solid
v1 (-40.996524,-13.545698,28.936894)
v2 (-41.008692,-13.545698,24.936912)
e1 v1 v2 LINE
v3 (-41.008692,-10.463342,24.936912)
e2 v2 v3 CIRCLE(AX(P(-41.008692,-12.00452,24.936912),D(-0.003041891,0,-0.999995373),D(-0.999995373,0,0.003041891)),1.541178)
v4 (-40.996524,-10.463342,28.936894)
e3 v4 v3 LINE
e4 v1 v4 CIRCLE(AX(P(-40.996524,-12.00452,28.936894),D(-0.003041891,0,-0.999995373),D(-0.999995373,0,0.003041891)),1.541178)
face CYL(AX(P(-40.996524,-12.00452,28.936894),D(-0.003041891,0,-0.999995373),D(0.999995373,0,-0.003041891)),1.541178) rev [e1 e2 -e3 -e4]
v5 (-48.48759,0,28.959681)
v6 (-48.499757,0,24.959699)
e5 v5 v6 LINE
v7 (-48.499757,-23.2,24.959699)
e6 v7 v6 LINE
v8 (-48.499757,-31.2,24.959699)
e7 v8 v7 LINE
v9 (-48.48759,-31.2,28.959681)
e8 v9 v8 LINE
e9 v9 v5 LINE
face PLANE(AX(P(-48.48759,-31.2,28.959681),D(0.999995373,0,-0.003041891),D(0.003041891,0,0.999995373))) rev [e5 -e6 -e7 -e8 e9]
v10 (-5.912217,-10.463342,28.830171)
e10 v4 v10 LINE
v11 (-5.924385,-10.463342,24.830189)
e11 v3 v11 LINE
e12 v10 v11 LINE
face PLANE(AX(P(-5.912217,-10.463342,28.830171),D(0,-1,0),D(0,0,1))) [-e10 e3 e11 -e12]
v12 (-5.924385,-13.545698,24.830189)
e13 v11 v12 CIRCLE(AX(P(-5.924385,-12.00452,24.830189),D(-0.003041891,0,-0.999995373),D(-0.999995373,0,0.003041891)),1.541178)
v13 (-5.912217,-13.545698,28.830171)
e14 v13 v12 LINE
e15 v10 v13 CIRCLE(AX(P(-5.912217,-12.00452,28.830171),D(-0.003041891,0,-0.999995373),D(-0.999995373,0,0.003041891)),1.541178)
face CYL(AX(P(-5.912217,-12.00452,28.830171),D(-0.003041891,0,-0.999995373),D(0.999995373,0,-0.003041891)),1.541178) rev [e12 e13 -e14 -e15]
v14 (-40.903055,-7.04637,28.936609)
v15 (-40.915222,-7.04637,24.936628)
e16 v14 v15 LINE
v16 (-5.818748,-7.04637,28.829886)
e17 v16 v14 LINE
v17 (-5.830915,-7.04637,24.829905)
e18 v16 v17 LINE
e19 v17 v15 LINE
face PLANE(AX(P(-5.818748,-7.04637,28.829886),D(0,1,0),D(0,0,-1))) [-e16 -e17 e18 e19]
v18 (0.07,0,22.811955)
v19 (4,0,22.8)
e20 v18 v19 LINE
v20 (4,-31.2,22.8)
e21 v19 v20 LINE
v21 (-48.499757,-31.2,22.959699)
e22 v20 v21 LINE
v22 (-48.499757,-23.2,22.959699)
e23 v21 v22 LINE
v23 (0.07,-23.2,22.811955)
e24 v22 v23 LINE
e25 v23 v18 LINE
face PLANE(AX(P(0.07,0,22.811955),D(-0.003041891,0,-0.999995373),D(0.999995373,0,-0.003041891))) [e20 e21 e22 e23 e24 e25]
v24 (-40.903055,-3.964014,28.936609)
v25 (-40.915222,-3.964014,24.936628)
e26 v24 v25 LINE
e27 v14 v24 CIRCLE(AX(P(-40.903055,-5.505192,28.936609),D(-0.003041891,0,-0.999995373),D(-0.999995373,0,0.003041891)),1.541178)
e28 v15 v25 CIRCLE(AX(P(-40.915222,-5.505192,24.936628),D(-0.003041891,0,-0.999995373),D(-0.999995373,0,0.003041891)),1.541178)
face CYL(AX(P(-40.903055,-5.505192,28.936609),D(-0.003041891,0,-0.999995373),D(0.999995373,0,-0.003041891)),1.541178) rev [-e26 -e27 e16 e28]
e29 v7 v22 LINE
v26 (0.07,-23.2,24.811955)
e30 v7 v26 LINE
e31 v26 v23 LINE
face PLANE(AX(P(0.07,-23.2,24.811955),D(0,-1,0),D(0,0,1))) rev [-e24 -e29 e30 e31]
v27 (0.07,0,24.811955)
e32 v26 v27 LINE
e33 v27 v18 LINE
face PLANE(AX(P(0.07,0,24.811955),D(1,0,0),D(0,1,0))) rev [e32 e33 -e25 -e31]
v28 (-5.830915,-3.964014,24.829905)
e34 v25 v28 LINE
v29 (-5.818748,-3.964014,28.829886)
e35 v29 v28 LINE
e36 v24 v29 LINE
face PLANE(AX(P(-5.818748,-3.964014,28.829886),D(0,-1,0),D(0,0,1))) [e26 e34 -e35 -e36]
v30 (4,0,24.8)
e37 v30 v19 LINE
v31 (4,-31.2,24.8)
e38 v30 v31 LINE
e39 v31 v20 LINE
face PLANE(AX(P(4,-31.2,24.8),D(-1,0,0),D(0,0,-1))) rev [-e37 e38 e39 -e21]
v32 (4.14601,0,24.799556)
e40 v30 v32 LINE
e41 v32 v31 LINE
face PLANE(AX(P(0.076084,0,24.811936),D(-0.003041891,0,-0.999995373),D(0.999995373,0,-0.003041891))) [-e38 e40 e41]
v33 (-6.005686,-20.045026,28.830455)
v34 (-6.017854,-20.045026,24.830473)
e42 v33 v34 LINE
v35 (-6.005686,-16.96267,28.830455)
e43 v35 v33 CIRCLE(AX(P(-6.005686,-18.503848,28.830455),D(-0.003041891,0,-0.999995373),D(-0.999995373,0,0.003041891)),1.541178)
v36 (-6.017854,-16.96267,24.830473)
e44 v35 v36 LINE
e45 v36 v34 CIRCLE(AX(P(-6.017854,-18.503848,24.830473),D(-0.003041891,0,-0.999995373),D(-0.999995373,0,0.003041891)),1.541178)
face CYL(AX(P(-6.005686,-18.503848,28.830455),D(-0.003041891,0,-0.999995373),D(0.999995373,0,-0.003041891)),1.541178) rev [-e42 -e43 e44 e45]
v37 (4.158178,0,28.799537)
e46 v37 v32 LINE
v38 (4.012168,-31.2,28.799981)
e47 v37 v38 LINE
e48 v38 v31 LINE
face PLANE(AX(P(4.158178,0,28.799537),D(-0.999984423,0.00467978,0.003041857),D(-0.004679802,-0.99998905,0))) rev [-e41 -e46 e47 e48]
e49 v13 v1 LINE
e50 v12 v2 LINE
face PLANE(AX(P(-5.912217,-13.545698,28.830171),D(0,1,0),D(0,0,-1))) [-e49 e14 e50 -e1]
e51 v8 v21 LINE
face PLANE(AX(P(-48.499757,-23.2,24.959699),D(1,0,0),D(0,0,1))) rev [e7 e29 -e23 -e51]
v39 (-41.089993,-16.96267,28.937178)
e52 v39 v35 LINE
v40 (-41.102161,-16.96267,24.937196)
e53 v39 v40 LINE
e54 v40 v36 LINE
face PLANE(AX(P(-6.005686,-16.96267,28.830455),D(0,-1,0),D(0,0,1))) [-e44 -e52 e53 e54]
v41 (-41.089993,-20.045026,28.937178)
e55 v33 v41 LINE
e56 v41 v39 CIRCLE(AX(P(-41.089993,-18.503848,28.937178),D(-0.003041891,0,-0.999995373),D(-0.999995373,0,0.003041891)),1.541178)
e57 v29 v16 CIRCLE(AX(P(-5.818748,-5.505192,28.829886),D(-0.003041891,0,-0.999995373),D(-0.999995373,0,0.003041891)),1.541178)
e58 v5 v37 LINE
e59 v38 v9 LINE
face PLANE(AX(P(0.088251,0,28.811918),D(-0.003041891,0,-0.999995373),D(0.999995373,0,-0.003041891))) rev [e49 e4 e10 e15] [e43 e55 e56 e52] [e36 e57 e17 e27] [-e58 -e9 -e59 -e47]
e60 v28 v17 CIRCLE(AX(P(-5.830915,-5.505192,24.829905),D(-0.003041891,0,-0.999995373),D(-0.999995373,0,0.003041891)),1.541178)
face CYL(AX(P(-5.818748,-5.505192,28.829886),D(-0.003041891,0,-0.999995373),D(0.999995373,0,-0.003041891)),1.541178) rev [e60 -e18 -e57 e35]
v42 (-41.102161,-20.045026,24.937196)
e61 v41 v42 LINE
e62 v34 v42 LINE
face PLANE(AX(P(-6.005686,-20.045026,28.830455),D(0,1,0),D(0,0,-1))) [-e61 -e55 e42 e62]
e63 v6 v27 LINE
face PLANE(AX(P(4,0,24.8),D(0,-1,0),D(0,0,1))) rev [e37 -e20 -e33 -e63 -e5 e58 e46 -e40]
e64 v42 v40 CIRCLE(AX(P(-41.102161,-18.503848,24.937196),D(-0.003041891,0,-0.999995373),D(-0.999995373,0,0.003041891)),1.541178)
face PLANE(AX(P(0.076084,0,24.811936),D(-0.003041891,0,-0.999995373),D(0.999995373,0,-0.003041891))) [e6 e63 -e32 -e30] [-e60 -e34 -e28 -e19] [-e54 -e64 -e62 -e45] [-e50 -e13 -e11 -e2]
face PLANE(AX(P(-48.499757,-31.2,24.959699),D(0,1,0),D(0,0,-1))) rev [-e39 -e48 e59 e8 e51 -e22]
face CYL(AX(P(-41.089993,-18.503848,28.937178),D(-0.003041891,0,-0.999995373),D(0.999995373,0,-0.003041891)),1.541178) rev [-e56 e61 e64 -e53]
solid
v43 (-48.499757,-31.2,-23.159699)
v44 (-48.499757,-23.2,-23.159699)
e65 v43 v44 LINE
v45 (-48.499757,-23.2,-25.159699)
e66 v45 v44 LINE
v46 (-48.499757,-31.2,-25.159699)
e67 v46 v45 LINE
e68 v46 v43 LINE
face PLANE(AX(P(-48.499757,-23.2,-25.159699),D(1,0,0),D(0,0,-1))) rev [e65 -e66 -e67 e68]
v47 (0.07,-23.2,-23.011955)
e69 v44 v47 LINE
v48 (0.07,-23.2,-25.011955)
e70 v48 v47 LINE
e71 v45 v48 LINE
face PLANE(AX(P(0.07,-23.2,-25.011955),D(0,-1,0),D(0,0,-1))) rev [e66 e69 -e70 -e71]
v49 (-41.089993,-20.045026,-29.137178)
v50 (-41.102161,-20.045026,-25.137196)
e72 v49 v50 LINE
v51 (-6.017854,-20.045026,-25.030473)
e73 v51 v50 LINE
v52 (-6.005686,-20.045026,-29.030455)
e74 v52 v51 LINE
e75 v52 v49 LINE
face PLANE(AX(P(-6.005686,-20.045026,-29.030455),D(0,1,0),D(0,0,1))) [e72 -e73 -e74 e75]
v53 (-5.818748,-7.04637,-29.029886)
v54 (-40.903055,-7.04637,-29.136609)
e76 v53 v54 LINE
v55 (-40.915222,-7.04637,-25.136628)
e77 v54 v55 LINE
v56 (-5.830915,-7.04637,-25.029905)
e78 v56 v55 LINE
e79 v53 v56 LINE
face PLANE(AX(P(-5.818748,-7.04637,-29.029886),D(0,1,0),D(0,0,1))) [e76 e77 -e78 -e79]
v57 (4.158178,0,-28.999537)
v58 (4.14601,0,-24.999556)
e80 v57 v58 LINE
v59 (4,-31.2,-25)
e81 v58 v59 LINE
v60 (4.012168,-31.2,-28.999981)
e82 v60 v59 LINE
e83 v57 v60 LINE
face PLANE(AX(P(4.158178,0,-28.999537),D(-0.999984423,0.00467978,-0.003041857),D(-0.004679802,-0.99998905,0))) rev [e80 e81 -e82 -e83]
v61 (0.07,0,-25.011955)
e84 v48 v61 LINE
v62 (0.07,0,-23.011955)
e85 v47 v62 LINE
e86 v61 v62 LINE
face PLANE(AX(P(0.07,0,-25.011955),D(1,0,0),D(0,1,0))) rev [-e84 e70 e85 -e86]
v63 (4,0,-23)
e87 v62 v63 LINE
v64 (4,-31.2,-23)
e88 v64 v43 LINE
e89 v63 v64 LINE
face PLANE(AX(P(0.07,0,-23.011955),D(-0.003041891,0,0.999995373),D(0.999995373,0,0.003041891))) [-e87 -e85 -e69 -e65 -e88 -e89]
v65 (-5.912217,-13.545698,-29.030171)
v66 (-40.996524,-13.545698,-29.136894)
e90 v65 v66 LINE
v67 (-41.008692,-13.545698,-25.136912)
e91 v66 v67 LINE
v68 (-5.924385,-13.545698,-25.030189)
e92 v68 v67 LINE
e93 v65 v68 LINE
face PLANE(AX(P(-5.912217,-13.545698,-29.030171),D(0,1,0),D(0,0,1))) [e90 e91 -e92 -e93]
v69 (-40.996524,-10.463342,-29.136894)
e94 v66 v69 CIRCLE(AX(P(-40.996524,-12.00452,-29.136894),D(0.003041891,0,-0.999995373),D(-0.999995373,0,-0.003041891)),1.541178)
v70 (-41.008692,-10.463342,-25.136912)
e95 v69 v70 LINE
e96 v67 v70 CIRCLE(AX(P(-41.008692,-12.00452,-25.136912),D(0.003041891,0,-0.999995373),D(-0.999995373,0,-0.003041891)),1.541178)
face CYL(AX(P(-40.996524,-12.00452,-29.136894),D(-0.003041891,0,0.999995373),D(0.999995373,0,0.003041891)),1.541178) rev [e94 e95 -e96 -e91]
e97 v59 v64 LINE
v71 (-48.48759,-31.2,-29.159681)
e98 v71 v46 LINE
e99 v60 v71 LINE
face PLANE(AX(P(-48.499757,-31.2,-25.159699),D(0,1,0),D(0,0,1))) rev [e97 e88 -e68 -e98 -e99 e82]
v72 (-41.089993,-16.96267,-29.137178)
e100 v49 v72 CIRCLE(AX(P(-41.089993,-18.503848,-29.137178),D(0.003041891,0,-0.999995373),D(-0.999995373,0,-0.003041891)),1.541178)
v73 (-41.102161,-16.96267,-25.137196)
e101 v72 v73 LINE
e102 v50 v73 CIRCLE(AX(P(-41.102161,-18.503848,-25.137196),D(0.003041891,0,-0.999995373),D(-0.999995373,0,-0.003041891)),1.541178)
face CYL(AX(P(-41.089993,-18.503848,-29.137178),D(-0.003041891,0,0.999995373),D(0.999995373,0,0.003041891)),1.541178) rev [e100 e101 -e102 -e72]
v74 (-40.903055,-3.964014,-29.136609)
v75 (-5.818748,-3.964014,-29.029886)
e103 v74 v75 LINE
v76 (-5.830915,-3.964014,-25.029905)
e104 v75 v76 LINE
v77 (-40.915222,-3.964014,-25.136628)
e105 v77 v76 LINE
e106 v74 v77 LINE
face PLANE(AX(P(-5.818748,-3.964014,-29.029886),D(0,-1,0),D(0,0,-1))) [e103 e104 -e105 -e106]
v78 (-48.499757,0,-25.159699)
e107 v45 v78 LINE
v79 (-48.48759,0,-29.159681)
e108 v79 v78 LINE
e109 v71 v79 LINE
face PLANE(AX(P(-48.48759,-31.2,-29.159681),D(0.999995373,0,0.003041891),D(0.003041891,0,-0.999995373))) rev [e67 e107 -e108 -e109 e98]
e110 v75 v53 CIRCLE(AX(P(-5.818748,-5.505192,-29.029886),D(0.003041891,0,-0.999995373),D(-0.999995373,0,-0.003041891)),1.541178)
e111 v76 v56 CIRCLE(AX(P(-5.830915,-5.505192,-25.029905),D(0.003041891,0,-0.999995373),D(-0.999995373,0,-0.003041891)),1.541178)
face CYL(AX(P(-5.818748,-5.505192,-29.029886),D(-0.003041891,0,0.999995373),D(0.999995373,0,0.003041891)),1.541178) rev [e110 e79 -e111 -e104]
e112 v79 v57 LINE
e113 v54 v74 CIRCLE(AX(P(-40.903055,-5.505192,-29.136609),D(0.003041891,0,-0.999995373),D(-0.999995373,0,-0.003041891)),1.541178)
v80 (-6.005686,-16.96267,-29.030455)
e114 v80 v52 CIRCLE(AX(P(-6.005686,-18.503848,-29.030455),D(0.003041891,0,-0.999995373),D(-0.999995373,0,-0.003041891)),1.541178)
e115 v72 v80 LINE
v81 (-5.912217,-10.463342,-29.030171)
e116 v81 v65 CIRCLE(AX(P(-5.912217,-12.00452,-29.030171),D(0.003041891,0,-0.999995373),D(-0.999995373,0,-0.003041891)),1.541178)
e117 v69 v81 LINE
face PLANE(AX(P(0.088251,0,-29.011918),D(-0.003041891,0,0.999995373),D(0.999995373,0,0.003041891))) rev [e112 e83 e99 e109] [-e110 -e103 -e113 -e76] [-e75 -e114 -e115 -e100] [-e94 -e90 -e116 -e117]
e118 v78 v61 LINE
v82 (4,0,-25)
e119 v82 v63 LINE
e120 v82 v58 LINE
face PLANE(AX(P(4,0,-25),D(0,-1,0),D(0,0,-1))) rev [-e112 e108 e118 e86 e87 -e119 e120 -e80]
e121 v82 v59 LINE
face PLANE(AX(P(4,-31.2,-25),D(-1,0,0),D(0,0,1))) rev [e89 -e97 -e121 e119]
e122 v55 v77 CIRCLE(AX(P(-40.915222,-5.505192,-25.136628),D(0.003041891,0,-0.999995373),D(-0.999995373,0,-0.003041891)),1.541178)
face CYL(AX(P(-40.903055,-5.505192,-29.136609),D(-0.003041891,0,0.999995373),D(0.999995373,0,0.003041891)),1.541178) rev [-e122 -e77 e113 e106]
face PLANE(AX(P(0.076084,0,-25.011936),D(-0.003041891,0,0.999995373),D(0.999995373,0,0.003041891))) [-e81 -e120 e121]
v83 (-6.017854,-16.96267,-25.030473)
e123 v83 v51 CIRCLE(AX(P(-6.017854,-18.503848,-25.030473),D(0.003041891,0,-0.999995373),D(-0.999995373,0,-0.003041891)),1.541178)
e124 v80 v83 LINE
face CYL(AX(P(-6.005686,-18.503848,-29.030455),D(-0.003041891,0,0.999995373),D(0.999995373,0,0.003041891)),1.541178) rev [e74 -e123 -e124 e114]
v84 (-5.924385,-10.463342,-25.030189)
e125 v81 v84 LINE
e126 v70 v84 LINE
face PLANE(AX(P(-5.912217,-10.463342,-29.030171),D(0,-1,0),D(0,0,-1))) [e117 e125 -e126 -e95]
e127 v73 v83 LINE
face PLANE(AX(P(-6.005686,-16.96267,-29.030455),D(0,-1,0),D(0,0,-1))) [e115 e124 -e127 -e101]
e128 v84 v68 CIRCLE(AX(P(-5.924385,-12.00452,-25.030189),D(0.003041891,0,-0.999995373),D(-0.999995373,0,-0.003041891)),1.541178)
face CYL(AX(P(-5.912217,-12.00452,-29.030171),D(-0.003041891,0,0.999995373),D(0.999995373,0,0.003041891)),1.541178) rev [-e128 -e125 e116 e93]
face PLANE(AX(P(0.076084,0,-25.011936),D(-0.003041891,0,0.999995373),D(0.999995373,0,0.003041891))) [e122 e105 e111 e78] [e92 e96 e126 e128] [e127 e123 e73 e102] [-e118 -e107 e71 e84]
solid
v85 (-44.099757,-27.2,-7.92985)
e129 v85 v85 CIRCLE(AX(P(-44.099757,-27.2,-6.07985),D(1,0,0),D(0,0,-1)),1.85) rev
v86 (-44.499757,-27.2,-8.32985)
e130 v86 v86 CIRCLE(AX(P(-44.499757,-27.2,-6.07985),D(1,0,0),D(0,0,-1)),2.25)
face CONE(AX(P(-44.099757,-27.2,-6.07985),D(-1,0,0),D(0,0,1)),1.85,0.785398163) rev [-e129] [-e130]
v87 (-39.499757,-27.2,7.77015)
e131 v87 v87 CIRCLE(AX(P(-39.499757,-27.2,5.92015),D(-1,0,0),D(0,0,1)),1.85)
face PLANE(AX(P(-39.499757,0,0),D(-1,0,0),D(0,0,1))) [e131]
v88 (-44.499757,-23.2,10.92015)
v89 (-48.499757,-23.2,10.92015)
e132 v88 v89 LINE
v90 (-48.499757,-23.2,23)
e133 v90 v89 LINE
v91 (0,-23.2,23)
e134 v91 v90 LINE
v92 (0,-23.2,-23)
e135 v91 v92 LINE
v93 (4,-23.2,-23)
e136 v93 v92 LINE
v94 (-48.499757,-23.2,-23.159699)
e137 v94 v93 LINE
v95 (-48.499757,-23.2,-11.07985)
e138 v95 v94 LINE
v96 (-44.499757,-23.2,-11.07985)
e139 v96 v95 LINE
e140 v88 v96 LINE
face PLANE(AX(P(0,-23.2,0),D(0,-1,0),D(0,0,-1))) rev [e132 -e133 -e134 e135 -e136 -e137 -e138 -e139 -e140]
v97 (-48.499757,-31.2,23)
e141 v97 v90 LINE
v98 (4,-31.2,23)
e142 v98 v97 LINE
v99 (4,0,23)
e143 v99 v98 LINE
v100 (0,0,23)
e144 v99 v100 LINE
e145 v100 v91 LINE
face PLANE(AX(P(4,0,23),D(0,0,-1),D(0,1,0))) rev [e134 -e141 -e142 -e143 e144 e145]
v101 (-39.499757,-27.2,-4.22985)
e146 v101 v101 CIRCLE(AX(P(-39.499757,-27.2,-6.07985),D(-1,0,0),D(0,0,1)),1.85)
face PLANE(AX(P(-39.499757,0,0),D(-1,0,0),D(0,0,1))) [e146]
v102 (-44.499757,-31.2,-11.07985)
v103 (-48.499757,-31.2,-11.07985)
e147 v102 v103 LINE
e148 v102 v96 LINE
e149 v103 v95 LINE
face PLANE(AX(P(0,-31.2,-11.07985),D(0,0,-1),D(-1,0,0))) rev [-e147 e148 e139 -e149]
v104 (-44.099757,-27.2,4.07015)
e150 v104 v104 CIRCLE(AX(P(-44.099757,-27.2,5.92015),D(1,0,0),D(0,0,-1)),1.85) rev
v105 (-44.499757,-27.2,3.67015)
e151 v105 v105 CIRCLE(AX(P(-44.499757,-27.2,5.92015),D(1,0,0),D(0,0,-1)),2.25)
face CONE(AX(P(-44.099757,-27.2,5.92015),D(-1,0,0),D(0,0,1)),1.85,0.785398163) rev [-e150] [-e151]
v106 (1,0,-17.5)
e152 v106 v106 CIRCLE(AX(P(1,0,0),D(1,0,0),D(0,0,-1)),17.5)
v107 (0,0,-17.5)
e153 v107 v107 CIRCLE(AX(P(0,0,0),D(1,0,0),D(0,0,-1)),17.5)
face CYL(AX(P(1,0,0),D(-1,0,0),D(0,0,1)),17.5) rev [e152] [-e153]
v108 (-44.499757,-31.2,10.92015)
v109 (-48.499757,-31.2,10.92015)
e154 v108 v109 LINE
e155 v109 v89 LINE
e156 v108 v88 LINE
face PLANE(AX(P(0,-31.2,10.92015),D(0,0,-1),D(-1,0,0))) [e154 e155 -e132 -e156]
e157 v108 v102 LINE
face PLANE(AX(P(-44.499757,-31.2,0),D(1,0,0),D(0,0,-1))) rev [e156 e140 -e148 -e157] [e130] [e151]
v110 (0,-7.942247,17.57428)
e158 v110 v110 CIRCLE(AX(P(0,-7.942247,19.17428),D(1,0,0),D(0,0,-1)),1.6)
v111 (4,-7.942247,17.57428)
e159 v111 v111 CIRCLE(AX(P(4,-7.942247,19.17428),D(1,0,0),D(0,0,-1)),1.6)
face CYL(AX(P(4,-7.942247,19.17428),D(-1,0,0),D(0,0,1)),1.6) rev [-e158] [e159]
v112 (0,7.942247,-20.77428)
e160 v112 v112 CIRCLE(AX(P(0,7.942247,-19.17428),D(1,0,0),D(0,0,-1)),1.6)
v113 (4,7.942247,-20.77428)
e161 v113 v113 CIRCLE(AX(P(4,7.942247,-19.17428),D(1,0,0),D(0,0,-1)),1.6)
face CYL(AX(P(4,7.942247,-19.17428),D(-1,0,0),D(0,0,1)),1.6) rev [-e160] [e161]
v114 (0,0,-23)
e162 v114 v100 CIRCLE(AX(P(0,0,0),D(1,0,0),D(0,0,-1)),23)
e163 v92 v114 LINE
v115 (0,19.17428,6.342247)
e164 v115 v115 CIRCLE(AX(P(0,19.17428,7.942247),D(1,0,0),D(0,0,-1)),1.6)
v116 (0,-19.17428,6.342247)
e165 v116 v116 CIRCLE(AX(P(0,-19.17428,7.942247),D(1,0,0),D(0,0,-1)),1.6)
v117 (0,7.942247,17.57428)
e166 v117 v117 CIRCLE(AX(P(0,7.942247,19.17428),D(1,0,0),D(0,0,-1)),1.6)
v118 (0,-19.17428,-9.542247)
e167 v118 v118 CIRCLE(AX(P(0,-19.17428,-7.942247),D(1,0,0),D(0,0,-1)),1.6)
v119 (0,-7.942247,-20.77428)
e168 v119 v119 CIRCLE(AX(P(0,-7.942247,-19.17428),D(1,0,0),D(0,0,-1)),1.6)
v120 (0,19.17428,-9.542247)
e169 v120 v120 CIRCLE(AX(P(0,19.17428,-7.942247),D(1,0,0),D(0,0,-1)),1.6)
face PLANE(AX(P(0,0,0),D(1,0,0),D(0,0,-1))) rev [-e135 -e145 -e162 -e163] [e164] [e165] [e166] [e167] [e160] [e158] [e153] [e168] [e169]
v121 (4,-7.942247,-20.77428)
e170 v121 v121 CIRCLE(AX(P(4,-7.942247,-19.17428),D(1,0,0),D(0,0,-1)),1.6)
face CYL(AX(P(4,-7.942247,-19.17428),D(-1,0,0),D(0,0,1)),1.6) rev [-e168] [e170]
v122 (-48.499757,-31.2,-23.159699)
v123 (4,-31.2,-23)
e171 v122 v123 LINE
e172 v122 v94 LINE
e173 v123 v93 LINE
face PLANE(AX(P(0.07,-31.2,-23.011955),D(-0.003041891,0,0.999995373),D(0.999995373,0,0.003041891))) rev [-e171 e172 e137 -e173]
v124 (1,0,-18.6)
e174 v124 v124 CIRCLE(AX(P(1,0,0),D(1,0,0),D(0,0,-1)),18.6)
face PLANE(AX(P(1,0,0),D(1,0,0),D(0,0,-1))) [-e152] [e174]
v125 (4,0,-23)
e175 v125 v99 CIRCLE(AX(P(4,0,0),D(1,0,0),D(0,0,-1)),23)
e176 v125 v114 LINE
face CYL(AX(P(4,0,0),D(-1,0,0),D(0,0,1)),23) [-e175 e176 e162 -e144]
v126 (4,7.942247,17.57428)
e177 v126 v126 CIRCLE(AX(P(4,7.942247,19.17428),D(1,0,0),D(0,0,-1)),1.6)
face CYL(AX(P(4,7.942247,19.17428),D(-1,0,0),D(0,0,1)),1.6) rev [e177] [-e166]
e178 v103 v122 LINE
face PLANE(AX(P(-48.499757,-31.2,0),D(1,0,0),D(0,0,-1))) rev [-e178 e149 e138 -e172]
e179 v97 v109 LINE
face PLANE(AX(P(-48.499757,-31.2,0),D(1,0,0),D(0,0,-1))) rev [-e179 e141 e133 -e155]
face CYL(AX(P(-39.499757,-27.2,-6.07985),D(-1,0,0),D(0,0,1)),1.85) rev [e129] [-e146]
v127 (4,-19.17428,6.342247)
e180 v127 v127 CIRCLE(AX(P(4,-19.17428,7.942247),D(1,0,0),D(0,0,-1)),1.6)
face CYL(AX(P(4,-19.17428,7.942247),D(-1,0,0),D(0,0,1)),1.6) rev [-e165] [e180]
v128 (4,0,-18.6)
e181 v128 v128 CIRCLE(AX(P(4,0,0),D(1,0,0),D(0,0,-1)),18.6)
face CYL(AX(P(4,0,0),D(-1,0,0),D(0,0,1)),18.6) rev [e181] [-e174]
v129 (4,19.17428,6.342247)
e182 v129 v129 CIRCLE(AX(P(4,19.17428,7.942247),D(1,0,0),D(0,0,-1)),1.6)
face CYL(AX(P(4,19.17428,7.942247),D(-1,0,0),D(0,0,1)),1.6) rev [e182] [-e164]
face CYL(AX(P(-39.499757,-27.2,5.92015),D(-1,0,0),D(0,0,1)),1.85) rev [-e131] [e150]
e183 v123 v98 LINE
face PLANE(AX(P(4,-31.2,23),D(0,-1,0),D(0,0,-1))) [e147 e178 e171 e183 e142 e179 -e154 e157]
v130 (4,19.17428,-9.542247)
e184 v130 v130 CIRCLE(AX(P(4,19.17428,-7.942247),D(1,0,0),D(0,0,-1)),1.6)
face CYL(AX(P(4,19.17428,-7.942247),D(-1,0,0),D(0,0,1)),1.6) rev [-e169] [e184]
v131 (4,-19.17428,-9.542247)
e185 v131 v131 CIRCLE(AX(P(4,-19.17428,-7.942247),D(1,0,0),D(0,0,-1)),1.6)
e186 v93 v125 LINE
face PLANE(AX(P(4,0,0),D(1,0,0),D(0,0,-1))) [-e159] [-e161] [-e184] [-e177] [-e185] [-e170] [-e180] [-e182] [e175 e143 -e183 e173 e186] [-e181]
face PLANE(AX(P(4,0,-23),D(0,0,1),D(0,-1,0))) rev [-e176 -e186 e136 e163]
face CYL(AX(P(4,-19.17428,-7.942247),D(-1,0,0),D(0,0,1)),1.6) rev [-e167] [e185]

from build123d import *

# Parameters (mm, degrees)
SKETCH_1_R                = 1.6
SKETCH_1_R_2              = 18.6
EXTRUDE_1_DEPTH           = 4
EXTRUDE_2_DEPTH           = 1
SKETCH_2_W                = 4
SKETCH_2_H                = 46
EXTRUDE_3_DEPTH           = 8
SKETCH_3_R                = 1.85
CUT_EXTRUDE_1_DEPTH       = 5
CHAMFER_2_SIZE            = 0.4
EXTRUDE_7_DEPTH           = 2
EXTRUDE_8_DEPTH           = 4
SKETCH_6_R                = 15
SKETCH_6_R_2              = 10
EXTRUDE_9_DEPTH           = 60
RIB_24_REACH              = 108.905
SKETCH_12_WALL_W          = 236.72683344
SKETCH_12_WALL_H          = 5
PATTERN_CIRCULAR_13_COUNT = 2
RIB_25_REACH              = 108.475
SKETCH_13_WALL_W          = 234.85356175
SKETCH_13_WALL_H          = 5
PATTERN_CIRCULAR_14_COUNT = 2
EXTRUDE_10_DEPTH          = 4
SPLIT_START               = -95.2
SPLIT_BODIES_1_DEPTH      = 64


# Read off the part's stored shape, not the designer's step: 分割1
with BuildPart() as part:
    # 草图1 → 凸台-拉伸1 (new body)
    with BuildSketch(Plane(origin=(0, 0, 0), x_dir=(0, 0, -1), z_dir=(1, 0, 0))):
        with BuildLine():
            ThreePointArc((23, 0), (0, 23), (-23, 0))
            Line((-23, 0), (-23, -23.2))
            Line((-23, -23.2), (23, -23.2))
            Line((23, -23.2), (23, 0))
        make_face()
        with Locations((-7.942246996, -19.174280415)):
            Circle(SKETCH_1_R, mode=Mode.SUBTRACT)
        with Locations((-19.174280415, -7.942246996)):
            Circle(SKETCH_1_R, mode=Mode.SUBTRACT)
        with Locations((7.942246996, -19.174280415)):
            Circle(SKETCH_1_R, mode=Mode.SUBTRACT)
        with Locations((19.174280415, -7.942246996)):
            Circle(SKETCH_1_R, mode=Mode.SUBTRACT)
        with Locations((-19.174280415, 7.942246996)):
            Circle(SKETCH_1_R, mode=Mode.SUBTRACT)
        with Locations((-7.942246996, 19.174280415)):
            Circle(SKETCH_1_R, mode=Mode.SUBTRACT)
        Circle(SKETCH_1_R_2, mode=Mode.SUBTRACT)
        with Locations((19.174280415, 7.942246996)):
            Circle(SKETCH_1_R, mode=Mode.SUBTRACT)
        with Locations((7.942246996, 19.174280415)):
            Circle(SKETCH_1_R, mode=Mode.SUBTRACT)
    extrude(amount=EXTRUDE_1_DEPTH)

    # 草图1<3> → 凸台-拉伸2 (add)
    with BuildSketch(Plane(origin=(0, 0, 0), x_dir=(0, 0, -1), z_dir=(1, 0, 0))):
        with BuildLine():
            ThreePointArc((18.6, 0), (0, 18.6), (-18.6, 0))
            ThreePointArc((-18.6, 0), (0, -18.6), (18.6, 0))
        make_face()
        with BuildLine():
            ThreePointArc((17.5, 0), (0, -17.5), (-17.5, 0))
            ThreePointArc((-17.5, 0), (0, 17.5), (17.5, 0))
        make_face(mode=Mode.SUBTRACT)
    extrude(amount=EXTRUDE_2_DEPTH)

    # 草图2 → 凸台-拉伸3 (add)
    with BuildSketch(Plane.XZ.offset(23.2)):
        Polygon((0, -23), (0, 23), (-48.499757106, 23), (-48.499757106, 10.920150371), (-44.499757106, 10.920150371), (-44.499757106, -11.079849629), (-48.499757106, -11.079849629), (-48.499757106, -23.159699257), (4, -23), align=None)
        with Locations((2, 0)):
            Rectangle(SKETCH_2_W, SKETCH_2_H)
    extrude(amount=EXTRUDE_3_DEPTH)

    # 草图3 → 切除-拉伸1 (cut)
    with BuildSketch(Plane.ZY.offset(44.499757106)):
        with Locations((5.920150371, -27.2)):
            Circle(SKETCH_3_R)
        with Locations((-6.079849629, -27.2)):
            Circle(SKETCH_3_R)
    extrude(amount=-CUT_EXTRUDE_1_DEPTH, mode=Mode.SUBTRACT)

    # 倒角2
    chamfer_2_edges = [part.edges().sort_by_distance(p)[0] for p in [
        (-44.499757106, -27.2, -7.929849629),
        (-44.499757106, -27.2, 4.070150371),
    ]]
    chamfer(chamfer_2_edges, length=CHAMFER_2_SIZE)

    # 草图6 → 凸台-拉伸9 (add)
    with BuildSketch(Plane.XZ.offset(31.2)):
        with Locations(Location((-22.23771099, -0.1, 0), (0, 0, 270))):
            Circle(SKETCH_6_R)
        with Locations(Location((-22.23771099, -0.1, 0), (0, 0, 270))):
            Circle(SKETCH_6_R_2, mode=Mode.SUBTRACT)
    extrude(amount=EXTRUDE_9_DEPTH)

    # 草图12 wall → 筋24 (add, up to next)
    with BuildSketch(Plane(origin=(-5.361401372, -38.595476089, -14.822347737), x_dir=(0.532846585871, 0.707106781177, -0.464838161019), z_dir=(-0.532846585853, 0.707106781196, 0.46483816101)), mode=Mode.PRIVATE) as rib_24_sk1:
        Rectangle(SKETCH_12_WALL_W, SKETCH_12_WALL_H)
    rib_24_tool1 = extrude(rib_24_sk1.sketch, amount=RIB_24_REACH, mode=Mode.PRIVATE) - part.part
    rib_24 = rib_24_tool1.solids().sort_by_distance((-5.361401372, -38.595476089, -14.822347737))[0]
    add(rib_24)

    # 阵列(圆周)13: 筋24 ×2 about axis
    pattern_circular_13_axis = Axis((-22.23771099, -91.2, -0.1), (0, 1, 0))
    for i in range(1, PATTERN_CIRCULAR_13_COUNT):
        add(rib_24.rotate(pattern_circular_13_axis, i * 360 / PATTERN_CIRCULAR_13_COUNT))

    # 草图13 wall → 筋25 (add, up to next)
    with BuildSketch(Plane(origin=(-6.655035456, -38.237231079, 15.482675535), x_dir=(0.500000000026, 0.707106781186, 0.499999999976), z_dir=(-0.499999999999, 0.707106781187, -0.499999999999)), mode=Mode.PRIVATE) as rib_25_sk1:
        Rectangle(SKETCH_13_WALL_W, SKETCH_13_WALL_H)
    rib_25_tool1 = extrude(rib_25_sk1.sketch, amount=RIB_25_REACH, mode=Mode.PRIVATE) - part.part
    rib_25 = rib_25_tool1.solids().sort_by_distance((-6.655035456, -38.237231079, 15.482675535))[0]
    add(rib_25)

    # 阵列(圆周)14: 筋25 ×2 about axis
    pattern_circular_14_axis = Axis((-22.23771099, -91.2, -0.1), (0, 1, 0))
    for i in range(1, PATTERN_CIRCULAR_14_COUNT):
        add(rib_25.rotate(pattern_circular_14_axis, i * 360 / PATTERN_CIRCULAR_14_COUNT))

    # 草图16 → 凸台-拉伸10 (add)
    with BuildSketch(Plane.XZ.offset(91.2)):
        Polygon((-22.249878553, 23), (7.749520178, 22.810063751), (7.749520178, -23.2), (-22.225543428, -23.2), (-52.225543428, -23.2), (-52.225543428, 23), align=None)
    extrude(amount=EXTRUDE_10_DEPTH)

    # Split Bodies 1 outline → Split Bodies 1 (cut)
    with BuildSketch(Plane(origin=(0, 0, 0), x_dir=(1, 0, 0), z_dir=(0, 1, 0)).offset(SPLIT_START)):
        Polygon((-52.225543428, -23), (-22.249878553, -23), (7.749520178, -22.810063751), (7.749520178, 23.2), (-52.225543428, 23.2), align=None)
    extrude(amount=SPLIT_BODIES_1_DEPTH, mode=Mode.SUBTRACT)


with BuildPart() as body_2:
    # 草图4 → 凸台-拉伸7 (new, along a direction that is not the sketch's normal)
    with BuildSketch(Plane(origin=(0.070000173, 0, -23.011954685), x_dir=(-0.9999953734400472, 0, -0.003041890612873783), z_dir=(0.003041890612873783, 0, -0.9999953734400472))):
        Polygon((-3.93001801, 0), (0, 0), (0, -23.2), (48.56998199, -23.2), (48.56998199, -31.2), (-3.93001801, -31.2), align=None)
    extrude(amount=EXTRUDE_7_DEPTH, dir=(0, 0, -1))

    # 草图5 → 凸台-拉伸8 (add)
    with BuildSketch(Plane(origin=(0.076083926, 0, -25.011936179), x_dir=(-0.9999953734400472, 0, -0.0030418906128740326), z_dir=(0.0030418906128740326, 0, -0.9999953734400472))):
        Polygon((-4.069944978, 0), (-3.923934228, -31.2), (48.576065772, -31.2), (48.576065772, 0), align=None)
        with BuildLine():
            Line((5.907026727, -3.964013685), (40.991495952, -3.964013685))
            ThreePointArc((40.991495952, -3.964013685), (42.532674187, -5.50519192), (40.991495952, -7.046370155))
            Line((40.991495952, -7.046370155), (5.907026727, -7.046370155))
            ThreePointArc((5.907026727, -7.046370155), (4.365848493, -5.50519192), (5.907026727, -3.964013685))
        make_face(mode=Mode.SUBTRACT)
        with BuildLine():
            Line((6.000496452, -10.463341605), (41.084965677, -10.463341605))
            ThreePointArc((41.084965677, -10.463341605), (42.626143912, -12.00451984), (41.084965677, -13.545698074))
            Line((41.084965677, -13.545698074), (6.000496452, -13.545698074))
            ThreePointArc((6.000496452, -13.545698074), (4.459318217, -12.00451984), (6.000496452, -10.463341605))
        make_face(mode=Mode.SUBTRACT)
        with BuildLine():
            Line((6.093966177, -16.962669525), (41.178435402, -16.962669525))
            ThreePointArc((41.178435402, -16.962669525), (42.719613636, -18.50384776), (41.178435402, -20.045025994))
            Line((41.178435402, -20.045025994), (6.093966177, -20.045025994))
            ThreePointArc((6.093966177, -20.045025994), (4.552787942, -18.50384776), (6.093966177, -16.962669525))
        make_face(mode=Mode.SUBTRACT)
    extrude(amount=EXTRUDE_8_DEPTH)


with BuildPart() as body_3:
    # 镜向3: mirrored copy
    add(body_2.part.mirror(Plane.XY))


with BuildPart() as body_3_1:
    # Move Body 1: moved
    add(body_3.part.moved(Location((0, 0, -0.2))))


solid = Compound([part.part, body_2.part, body_3_1.part])
